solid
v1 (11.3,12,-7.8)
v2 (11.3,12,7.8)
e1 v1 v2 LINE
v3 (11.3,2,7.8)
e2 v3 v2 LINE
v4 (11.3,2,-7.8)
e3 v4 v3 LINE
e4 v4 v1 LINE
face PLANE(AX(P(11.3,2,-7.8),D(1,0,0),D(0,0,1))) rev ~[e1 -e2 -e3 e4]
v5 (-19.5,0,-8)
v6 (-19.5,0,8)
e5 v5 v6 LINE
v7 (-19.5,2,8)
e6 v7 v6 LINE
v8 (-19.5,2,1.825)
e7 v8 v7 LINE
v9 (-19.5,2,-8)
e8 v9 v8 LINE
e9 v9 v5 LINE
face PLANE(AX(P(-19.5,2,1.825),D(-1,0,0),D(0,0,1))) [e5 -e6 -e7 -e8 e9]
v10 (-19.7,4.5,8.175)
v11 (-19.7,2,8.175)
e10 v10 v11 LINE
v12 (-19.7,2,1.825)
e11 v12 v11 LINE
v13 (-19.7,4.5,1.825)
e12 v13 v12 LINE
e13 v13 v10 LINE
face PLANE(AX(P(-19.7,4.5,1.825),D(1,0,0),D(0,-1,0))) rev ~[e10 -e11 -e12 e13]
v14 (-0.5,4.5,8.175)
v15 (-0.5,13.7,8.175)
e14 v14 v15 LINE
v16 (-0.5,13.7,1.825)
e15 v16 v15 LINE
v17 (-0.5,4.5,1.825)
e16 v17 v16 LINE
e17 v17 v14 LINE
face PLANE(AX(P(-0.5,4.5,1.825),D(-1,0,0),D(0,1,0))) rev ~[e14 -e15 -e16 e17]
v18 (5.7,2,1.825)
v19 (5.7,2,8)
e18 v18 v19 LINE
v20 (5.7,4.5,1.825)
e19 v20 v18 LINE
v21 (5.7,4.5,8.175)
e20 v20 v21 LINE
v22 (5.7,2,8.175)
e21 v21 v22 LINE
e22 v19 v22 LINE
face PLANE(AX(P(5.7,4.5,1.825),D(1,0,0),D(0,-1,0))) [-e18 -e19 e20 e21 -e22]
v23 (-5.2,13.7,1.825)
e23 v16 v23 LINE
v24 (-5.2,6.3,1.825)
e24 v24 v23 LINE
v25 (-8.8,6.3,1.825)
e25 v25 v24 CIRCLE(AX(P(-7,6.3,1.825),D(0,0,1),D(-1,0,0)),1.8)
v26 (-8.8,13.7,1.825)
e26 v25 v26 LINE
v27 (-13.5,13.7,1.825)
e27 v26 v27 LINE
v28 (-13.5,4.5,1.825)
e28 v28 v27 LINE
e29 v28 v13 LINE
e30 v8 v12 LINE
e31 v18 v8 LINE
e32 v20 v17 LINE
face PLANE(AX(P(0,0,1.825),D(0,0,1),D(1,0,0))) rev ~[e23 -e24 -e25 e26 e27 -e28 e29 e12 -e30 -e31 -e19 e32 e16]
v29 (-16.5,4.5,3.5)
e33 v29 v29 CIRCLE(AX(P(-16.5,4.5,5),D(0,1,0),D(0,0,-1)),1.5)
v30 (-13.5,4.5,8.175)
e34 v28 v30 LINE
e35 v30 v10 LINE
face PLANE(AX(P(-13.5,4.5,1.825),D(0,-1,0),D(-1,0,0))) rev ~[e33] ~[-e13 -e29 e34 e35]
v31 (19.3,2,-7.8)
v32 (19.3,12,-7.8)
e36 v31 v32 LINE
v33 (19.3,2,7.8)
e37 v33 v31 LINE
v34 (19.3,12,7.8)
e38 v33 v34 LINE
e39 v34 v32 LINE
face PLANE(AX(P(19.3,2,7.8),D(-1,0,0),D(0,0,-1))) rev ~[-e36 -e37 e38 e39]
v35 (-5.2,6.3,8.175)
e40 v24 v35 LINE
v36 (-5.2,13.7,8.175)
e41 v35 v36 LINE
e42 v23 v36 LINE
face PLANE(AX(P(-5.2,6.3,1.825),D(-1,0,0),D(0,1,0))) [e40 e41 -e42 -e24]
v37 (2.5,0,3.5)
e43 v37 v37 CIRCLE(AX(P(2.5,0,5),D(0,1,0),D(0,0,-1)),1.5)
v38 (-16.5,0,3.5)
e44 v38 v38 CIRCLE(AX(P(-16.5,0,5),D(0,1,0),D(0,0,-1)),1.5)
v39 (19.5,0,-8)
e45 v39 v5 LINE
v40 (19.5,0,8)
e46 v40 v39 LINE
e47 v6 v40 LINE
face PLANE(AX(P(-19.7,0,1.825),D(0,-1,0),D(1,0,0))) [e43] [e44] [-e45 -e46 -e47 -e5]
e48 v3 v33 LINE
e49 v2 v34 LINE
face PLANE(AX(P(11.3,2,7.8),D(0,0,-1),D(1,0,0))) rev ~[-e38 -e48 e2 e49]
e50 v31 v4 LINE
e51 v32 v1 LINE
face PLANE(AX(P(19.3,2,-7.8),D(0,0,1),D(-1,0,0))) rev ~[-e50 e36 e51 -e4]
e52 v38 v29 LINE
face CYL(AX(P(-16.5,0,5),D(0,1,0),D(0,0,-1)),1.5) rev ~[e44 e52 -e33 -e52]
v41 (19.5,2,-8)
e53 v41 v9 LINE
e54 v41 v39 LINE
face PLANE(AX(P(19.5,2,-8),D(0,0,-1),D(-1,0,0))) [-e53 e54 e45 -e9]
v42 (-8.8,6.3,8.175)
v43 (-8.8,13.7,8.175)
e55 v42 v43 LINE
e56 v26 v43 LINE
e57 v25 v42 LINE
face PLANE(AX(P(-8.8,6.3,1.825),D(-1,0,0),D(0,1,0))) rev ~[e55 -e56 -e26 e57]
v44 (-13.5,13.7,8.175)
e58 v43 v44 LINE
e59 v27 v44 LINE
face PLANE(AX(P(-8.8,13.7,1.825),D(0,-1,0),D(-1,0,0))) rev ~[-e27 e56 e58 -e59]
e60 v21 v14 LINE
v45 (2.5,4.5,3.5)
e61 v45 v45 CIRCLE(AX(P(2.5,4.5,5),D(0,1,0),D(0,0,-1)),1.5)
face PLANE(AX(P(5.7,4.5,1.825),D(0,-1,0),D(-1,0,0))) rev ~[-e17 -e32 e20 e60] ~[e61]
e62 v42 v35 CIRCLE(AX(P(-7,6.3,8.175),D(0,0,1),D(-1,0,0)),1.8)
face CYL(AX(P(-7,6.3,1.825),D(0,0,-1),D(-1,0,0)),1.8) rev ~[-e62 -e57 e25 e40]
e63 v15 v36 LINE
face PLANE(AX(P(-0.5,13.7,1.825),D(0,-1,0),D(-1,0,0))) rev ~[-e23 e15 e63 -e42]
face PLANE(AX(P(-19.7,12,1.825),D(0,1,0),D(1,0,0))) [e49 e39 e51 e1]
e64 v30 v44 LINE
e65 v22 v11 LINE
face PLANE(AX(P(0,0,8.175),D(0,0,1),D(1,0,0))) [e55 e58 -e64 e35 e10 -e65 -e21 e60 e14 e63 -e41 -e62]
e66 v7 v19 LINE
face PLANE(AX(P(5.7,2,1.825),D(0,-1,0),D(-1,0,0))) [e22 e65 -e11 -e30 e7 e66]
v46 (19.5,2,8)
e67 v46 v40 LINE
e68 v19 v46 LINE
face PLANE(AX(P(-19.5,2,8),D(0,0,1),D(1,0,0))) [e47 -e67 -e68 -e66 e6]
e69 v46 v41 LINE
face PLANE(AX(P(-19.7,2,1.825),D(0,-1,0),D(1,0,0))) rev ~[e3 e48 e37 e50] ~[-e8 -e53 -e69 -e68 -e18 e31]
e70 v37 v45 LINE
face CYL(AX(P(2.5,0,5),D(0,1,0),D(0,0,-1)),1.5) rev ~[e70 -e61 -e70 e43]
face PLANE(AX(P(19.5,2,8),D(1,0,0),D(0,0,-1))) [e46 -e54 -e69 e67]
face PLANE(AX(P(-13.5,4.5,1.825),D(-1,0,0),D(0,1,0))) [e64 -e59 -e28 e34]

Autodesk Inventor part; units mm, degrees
ref_plane "YZ Plane" through (0, 0, 0) normal (1, 0, 0) x (0, 1, 0)
ref_plane "XZ Plane" through (0, 0, 0) normal (0, 1, 0) x (-1, 0, 0)
ref_plane "Work Plane1" through (0, 0, 1.825) normal (0, 0, 1) x (1, 0, 0)
sketch "Sketch1" plane through (0, 0, 1.825) normal (0, 0, 1) x (1, 0, 0)
  line L0 (5.7, 2) -> (-19.7, 2)
  line L1 (5.7, 4.5) -> (5.7, 2)
  line L2 (-0.5, 13.7) -> (-5.2, 13.7)
  line L3 (-8.8, 6.3) -> (-8.8, 13.7)
  line L4 (-13.5, 4.5) -> (-19.7, 4.5)
  line L5 (5.7, 4.5) -> (-0.5, 4.5)
  line L6 (-5.2, 6.3) -> (-5.2, 13.7)
  line L7 (-8.8, 13.7) -> (-13.5, 13.7)
  line L8 (-19.7, 4.5) -> (-19.7, 2)
  line L9 (-0.5, 4.5) -> (-0.5, 13.7)
  arc A0 (-8.8, 6.3) -> (-5.2, 6.3) centre (-7, 6.3) ccw
  line L10 (-13.5, 4.5) -> (-13.5, 13.7)
extrude "Extrusion3" add sketch "Sketch1" along normal blind 6.35
sketch "Sketch2" plane through (-19.7, 2, 1.825) normal (0, -1, 0) x (1, 0, 0)
  line L0 (0.2, 0) -> (0.2, 6.175)
  line L1 (0.2, 6.175) -> (25.4, 6.175)
  line L2 (25.4, 6.175) -> (39.2, 6.175)
  line L3 (39.2, 6.175) -> (39.2, -9.825)
  line L4 (39.2, -9.825) -> (0.2, -9.825)
  line L5 (0.2, -9.825) -> (0.2, 0)
extrude "Extrusion2" add sketch "Sketch2" along normal blind 2
hole "Hole2" at (-16.5, 0, 5) direction (0, 1, 0) diameter 3 depth 4.5
sketch "Sketch3" plane through (0, 0, 0) normal (0, 1, 0) x (-1, 0, 0)
  point P0 (16.5, 5)
hole "Hole1" at (2.5, 0, 5) direction (0, 1, 0) diameter 3 depth 4.5
sketch "Sketch5" plane through (-19.7, 2, 1.825) normal (0, 1, 0) x (1, 0, 0)
  line L0 (31, -5.975) -> (39, -5.975)
  line L1 (39, -5.975) -> (39, 9.625)
  line L2 (31, 9.625) -> (31, -5.975)
  line L3 (39, 9.625) -> (31, 9.625)
extrude "Extrusion1" add sketch "Sketch5" along normal blind 10
sketch "Sketch4" plane through (0, 0, 0) normal (0, 1, 0) x (-1, 0, 0)
  point P0 (-2.5, 5)
properties part number "Endstop"
